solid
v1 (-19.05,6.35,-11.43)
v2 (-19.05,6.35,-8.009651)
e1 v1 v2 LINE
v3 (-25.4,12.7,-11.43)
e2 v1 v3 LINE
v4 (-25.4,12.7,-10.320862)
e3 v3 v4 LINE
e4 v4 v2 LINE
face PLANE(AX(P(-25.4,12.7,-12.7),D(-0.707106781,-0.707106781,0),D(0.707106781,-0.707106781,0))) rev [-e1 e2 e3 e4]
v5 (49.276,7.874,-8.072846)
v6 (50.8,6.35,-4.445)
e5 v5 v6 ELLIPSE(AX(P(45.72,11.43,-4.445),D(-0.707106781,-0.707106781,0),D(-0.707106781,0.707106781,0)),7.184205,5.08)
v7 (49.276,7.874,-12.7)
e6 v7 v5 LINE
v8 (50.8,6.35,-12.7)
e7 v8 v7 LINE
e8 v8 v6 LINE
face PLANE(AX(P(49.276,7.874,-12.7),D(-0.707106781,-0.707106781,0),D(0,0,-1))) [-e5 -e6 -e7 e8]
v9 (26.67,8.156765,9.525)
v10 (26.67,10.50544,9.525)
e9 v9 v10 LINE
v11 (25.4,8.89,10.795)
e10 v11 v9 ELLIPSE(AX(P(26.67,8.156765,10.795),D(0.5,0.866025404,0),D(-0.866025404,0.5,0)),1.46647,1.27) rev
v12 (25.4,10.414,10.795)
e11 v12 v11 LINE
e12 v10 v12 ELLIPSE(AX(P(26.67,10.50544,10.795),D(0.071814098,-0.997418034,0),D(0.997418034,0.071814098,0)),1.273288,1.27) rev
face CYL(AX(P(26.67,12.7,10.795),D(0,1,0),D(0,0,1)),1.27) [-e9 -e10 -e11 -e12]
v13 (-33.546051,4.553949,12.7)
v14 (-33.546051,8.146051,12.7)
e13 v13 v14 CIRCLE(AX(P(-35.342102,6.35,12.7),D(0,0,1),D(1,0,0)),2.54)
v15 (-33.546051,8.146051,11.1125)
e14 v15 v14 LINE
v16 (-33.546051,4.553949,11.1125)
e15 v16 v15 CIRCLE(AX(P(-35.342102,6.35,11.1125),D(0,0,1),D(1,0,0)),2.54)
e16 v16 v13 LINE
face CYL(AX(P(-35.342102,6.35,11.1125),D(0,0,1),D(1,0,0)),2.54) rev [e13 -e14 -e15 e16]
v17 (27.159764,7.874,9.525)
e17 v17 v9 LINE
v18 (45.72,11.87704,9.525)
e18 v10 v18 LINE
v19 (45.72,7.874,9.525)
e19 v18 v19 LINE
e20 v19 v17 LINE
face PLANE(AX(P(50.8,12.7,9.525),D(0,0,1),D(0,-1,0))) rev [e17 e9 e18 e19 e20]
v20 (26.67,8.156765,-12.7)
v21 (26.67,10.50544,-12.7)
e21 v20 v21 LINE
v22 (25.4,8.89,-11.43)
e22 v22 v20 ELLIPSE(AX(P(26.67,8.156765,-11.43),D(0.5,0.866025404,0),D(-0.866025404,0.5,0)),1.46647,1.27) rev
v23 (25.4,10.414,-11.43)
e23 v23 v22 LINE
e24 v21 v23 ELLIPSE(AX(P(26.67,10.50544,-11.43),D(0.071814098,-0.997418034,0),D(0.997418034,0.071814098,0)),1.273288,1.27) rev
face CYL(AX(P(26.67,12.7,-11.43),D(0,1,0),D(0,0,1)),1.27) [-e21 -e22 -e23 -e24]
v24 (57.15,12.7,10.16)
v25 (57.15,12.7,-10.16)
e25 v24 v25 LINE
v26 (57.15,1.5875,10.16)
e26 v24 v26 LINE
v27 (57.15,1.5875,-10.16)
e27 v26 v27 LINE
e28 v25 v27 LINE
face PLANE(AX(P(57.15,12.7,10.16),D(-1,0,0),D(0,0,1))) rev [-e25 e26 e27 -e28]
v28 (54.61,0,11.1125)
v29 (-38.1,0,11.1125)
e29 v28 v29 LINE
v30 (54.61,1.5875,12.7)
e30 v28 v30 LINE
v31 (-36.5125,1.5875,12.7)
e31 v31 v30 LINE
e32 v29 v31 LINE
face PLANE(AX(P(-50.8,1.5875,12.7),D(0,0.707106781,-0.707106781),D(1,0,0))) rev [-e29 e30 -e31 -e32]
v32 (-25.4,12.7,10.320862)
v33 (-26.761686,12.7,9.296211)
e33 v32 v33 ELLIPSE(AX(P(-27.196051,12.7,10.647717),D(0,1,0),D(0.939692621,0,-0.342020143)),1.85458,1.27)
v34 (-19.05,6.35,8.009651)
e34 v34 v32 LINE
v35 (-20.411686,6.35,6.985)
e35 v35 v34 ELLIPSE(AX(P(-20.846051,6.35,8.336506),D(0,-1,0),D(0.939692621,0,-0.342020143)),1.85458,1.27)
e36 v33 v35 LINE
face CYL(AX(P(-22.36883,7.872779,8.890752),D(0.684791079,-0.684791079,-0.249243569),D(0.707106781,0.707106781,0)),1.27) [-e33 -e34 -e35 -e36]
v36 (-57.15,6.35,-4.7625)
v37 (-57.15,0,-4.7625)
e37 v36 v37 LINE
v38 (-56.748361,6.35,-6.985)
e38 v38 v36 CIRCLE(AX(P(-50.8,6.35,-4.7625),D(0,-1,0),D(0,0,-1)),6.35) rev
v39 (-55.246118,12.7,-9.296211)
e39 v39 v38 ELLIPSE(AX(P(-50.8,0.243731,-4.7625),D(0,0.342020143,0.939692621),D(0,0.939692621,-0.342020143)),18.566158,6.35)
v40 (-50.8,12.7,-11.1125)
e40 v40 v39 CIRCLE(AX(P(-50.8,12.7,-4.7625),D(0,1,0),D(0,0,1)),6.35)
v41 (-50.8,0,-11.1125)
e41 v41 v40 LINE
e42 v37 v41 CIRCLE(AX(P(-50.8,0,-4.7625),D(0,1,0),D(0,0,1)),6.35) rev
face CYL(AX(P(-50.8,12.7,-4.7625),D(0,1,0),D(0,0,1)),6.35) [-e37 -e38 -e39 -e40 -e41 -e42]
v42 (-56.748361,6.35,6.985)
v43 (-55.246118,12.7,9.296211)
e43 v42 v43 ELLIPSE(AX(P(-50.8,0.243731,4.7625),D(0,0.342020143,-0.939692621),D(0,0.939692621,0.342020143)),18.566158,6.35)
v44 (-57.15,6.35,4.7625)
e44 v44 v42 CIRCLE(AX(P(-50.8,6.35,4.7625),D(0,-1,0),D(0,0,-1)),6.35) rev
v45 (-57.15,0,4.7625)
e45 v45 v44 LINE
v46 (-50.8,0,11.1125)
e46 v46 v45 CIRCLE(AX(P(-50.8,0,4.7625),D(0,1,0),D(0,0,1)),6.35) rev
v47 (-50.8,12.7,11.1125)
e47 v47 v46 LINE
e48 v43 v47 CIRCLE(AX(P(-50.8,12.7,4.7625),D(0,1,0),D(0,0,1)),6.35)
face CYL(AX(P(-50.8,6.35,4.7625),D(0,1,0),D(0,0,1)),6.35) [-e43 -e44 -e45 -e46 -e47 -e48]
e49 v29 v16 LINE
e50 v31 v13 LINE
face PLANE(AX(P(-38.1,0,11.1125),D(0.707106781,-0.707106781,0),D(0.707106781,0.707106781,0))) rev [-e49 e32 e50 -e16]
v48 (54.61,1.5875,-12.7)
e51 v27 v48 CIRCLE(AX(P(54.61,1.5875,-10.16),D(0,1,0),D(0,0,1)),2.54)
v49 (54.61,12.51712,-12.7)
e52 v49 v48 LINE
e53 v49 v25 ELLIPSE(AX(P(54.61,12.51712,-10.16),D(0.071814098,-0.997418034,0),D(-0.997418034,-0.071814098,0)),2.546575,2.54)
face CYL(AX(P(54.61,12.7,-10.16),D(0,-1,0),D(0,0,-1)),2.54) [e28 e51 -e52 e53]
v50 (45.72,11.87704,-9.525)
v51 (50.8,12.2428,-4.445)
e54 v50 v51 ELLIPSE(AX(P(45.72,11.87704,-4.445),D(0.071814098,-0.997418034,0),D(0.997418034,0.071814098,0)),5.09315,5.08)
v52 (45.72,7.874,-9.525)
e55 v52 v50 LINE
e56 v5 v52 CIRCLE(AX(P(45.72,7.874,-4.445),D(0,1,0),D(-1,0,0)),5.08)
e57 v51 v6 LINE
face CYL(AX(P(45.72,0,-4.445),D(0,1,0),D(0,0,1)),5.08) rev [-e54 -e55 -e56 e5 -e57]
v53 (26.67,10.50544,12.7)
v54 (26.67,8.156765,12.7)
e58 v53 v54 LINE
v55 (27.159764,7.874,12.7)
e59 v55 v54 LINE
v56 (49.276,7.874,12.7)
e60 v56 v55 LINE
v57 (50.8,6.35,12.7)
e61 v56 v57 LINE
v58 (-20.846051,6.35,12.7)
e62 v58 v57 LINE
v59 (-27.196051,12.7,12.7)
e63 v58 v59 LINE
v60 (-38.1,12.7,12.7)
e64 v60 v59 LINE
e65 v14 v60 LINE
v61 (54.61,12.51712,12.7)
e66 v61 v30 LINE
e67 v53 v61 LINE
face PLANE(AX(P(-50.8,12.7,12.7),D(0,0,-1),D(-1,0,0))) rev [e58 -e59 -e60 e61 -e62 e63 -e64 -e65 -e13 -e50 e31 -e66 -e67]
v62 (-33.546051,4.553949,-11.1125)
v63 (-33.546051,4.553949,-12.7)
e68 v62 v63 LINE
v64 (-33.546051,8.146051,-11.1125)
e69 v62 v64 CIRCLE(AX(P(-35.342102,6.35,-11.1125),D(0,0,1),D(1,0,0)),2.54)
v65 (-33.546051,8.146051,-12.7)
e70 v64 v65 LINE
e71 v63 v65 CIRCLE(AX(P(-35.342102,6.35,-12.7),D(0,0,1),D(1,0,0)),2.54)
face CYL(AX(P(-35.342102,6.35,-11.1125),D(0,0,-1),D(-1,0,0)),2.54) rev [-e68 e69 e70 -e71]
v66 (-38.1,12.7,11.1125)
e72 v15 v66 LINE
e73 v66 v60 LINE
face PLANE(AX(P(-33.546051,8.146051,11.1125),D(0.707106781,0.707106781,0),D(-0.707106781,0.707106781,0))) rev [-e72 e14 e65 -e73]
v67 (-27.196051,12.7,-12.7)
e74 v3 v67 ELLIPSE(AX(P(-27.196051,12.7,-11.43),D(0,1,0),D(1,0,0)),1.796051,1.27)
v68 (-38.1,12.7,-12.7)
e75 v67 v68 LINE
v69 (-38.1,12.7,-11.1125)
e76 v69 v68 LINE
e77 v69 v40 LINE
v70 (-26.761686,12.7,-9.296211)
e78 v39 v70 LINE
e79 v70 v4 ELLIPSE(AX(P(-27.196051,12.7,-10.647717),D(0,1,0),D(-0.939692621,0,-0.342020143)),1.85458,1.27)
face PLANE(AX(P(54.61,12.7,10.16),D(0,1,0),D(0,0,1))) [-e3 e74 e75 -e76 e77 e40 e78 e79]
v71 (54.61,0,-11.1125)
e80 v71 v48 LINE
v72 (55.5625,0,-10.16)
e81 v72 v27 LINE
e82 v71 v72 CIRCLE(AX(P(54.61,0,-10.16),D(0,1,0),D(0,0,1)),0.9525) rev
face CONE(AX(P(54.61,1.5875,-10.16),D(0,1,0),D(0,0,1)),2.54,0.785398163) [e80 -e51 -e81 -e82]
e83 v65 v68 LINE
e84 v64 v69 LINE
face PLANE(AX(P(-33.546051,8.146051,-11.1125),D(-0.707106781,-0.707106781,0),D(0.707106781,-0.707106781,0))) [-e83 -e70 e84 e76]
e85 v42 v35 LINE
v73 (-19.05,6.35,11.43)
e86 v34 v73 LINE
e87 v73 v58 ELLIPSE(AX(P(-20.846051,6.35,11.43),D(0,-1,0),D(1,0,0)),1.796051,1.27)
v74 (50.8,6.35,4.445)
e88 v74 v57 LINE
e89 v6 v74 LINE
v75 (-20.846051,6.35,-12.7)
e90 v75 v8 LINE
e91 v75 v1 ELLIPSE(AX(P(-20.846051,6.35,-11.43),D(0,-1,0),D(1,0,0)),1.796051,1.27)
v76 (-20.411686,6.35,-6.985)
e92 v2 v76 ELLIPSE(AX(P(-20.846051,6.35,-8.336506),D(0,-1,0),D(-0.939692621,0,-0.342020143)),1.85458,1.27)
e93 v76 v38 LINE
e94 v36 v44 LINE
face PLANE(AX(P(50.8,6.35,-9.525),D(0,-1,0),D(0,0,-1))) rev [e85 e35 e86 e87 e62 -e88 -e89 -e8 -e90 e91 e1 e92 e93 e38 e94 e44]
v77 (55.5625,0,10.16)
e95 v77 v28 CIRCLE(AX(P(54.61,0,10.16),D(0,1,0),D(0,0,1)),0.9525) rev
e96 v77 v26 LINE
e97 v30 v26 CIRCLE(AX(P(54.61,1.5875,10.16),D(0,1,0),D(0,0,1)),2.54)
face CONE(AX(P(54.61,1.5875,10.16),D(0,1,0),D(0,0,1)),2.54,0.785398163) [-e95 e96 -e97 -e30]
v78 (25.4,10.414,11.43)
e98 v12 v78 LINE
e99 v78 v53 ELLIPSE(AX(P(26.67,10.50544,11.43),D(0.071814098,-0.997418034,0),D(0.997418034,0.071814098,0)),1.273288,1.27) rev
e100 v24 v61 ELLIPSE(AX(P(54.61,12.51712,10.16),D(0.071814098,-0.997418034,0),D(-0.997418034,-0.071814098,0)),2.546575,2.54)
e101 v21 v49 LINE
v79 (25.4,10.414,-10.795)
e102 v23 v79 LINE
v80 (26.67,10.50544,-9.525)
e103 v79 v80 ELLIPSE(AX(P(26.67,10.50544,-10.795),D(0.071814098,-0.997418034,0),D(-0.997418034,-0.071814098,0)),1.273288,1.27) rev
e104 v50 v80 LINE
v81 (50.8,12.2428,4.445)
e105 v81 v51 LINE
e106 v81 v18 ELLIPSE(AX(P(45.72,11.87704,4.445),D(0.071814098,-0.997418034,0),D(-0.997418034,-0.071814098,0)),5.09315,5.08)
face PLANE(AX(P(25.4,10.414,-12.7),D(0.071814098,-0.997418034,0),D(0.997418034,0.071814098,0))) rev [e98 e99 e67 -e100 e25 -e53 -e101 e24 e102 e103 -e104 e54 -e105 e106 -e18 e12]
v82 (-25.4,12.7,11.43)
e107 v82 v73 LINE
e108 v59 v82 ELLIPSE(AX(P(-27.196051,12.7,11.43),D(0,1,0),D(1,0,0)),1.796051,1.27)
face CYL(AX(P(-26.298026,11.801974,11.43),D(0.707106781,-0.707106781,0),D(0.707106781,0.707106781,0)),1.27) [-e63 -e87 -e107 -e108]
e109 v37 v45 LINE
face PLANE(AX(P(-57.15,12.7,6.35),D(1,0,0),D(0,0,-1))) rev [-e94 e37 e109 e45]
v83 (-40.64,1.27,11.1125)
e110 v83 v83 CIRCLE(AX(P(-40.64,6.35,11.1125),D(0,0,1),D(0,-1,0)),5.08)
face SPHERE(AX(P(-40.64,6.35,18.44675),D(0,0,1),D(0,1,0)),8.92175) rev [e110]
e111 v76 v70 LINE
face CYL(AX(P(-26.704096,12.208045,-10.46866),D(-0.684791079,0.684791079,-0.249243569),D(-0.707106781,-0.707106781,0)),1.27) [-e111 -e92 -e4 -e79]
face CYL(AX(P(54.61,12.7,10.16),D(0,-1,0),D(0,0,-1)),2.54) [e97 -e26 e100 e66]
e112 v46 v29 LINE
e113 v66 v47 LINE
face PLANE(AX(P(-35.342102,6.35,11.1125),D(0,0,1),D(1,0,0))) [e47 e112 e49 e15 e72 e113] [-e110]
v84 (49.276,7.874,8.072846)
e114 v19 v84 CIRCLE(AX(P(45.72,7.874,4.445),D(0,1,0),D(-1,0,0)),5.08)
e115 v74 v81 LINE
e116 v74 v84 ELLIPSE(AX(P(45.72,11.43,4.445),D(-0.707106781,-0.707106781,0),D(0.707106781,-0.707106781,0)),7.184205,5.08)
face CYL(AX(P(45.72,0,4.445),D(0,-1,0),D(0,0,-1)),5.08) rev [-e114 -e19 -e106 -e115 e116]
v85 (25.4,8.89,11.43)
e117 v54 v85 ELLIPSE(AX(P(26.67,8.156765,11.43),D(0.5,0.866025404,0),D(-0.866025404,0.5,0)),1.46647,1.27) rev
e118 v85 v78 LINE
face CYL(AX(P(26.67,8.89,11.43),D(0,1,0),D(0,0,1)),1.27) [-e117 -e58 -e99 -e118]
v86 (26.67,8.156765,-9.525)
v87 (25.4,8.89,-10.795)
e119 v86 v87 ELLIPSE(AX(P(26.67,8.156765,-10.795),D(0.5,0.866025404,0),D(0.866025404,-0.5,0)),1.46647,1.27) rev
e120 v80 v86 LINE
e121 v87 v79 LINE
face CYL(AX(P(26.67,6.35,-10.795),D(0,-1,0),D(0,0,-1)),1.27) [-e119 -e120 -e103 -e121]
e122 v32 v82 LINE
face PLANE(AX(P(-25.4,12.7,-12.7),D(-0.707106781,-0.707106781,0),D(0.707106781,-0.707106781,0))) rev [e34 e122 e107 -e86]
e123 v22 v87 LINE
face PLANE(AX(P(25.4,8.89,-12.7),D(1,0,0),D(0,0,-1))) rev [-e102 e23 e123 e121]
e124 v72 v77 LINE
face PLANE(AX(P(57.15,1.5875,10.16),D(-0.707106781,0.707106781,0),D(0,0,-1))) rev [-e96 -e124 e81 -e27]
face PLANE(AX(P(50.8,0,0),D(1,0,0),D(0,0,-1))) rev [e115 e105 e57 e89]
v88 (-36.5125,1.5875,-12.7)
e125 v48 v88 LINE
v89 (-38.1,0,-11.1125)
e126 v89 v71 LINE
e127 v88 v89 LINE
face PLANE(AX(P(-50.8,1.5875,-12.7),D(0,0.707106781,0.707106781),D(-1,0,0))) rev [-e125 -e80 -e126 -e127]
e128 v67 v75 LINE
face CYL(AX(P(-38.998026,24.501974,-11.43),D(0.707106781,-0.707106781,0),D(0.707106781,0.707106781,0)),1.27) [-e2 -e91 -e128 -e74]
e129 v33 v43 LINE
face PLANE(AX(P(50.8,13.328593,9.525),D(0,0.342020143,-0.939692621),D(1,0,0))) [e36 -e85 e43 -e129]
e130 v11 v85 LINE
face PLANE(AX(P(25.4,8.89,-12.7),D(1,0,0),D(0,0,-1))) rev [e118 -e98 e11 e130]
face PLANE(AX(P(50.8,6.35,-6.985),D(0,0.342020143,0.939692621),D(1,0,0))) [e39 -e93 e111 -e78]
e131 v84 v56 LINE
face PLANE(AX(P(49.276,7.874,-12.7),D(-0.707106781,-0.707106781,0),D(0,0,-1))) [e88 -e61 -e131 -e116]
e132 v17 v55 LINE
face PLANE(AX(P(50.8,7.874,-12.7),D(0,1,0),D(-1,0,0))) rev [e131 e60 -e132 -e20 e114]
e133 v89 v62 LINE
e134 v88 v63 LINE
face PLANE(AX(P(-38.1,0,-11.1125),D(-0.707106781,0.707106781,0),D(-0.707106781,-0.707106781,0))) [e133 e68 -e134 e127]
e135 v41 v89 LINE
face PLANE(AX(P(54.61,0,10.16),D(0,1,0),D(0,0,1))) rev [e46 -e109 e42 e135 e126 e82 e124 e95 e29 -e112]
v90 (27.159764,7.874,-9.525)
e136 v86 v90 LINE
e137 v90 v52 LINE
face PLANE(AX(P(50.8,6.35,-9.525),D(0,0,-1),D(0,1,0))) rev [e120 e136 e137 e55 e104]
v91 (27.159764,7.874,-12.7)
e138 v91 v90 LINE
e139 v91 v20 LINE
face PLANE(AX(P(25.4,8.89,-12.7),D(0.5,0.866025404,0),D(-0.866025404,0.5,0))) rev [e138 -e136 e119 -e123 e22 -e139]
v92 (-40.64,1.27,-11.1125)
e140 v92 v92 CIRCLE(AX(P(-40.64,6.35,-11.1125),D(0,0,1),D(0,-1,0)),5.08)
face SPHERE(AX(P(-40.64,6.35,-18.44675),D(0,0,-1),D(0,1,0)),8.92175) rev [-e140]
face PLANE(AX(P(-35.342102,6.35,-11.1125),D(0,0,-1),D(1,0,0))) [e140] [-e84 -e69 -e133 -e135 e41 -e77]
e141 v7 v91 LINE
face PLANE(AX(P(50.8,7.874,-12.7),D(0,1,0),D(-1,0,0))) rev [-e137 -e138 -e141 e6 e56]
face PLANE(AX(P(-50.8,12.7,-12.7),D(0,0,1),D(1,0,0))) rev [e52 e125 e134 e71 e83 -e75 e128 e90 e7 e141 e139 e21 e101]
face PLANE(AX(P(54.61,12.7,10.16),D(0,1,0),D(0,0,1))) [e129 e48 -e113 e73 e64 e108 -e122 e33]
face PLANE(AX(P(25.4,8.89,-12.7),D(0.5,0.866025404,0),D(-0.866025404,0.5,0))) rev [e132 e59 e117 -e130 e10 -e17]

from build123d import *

# Parameters (mm, degrees)
BOSS_EXTRUDE1_DEPTH = 12.7
SKETCH2_W           = 19.05
SKETCH2_H           = 6.35
CUT_EXTRUDE1_DEPTH  = 107.95
CUT_EXTRUDE2_DEPTH  = 64.816710194
CHAMFER1_SIZE       = 6.978592645
CHAMFER1_SIZE_2     = 2.54
CUT_EXTRUDE3_DEPTH  = 1.5875
CHAMFER3_SIZE       = 1.5875
FILLET1_R           = 6.35
FILLET2_R           = 1.27
FILLET3_R           = 5.08
CHAMFER4_SIZE       = 1.524


# Some blends are built 0.0001 mm under size
with BuildPart() as part:
    # Sketch1 → Boss-Extrude1 (new body)
    with BuildSketch(Plane(origin=(0, 0, 0), x_dir=(1, 0, 0), z_dir=(0, 1, 0))):
        with BuildLine():
            Line((-50.8, 12.7), (-57.15, 12.7))
            Line((-57.15, 12.7), (-57.15, 6.35))
            Line((-57.15, 6.35), (-57.15, -6.35))
            Line((-57.15, -6.35), (-57.15, -12.7))
            Line((-57.15, -12.7), (-50.8, -12.7))
            Line((-50.8, -12.7), (54.61, -12.7))
            ThreePointArc((54.61, -12.7), (56.406051224, -11.956051224), (57.15, -10.16))
            Line((57.15, -10.16), (57.15, 10.16))
            ThreePointArc((57.15, 10.16), (56.406051224, 11.956051224), (54.61, 12.7))
            Line((54.61, 12.7), (-50.8, 12.7))
        make_face()
    extrude(amount=BOSS_EXTRUDE1_DEPTH)

    # Sketch2 → Cut-Extrude1 (cut)
    with BuildSketch(Plane.ZY.offset(57.15)):
        with Locations((0, 9.525)):
            Rectangle(SKETCH2_W, SKETCH2_H)
    extrude(amount=-CUT_EXTRUDE1_DEPTH, mode=Mode.SUBTRACT)

    # Sketch3 → Cut-Extrude2 (cut, through all)
    with BuildSketch(Plane.XY.offset(12.7)):
        Polygon((25.4, 10.414), (57.15, 12.7), (-25.4, 12.7), (-19.05, 6.35), (50.8, 6.35), (50.8, 7.874), (27.15976362, 7.874), (25.4, 8.89), align=None)
    extrude(amount=-CUT_EXTRUDE2_DEPTH, mode=Mode.SUBTRACT)

    # Chamfer1
    # the kernel refuses this chamfer: 6.978592645, 2.54 mm, written as the material it adds along each edge
    with BuildSketch(Plane(origin=(-57.15, 6.35, 9.525), x_dir=(0, 0.9999130865277316, 0.013184058198642549), z_dir=(1, 0, 0))) as chamfer1_piece_1_section:
        Polygon((CHAMFER1_SIZE * 0.999913086587, -CHAMFER1_SIZE * 0.0131840581994), (-CHAMFER1_SIZE_2 * 0.0131840581987, -CHAMFER1_SIZE_2 * 0.999913086528), (0, 0), align=None)
    chamfer1_piece_1 = extrude(amount=56.203828281, mode=Mode.PRIVATE)
    chamfer1_piece_1 = split(chamfer1_piece_1, bisect_by=Plane(origin=(-39.199121236, 12.7, 8.706690515), z_dir=(0, -1, 0)), keep=Keep.TOP, mode=Mode.PRIVATE)
    chamfer1_piece_1 = split(chamfer1_piece_1, bisect_by=Plane(origin=(-30.223681853, 17.523681853, 8.706690515), z_dir=(-0.7071067811865448, -0.7071067811865503, 0)), keep=Keep.TOP, mode=Mode.PRIVATE)
    add(chamfer1_piece_1)
    with BuildSketch(Plane(origin=(-57.15, 6.35, -9.525), x_dir=(0, -0.09904090225207035, 0.9950833631817466), z_dir=(1, 0, 0))) as chamfer1_piece_2_section:
        Polygon((CHAMFER1_SIZE_2 * 0.995083363182, -CHAMFER1_SIZE_2 * 0.099040902252), (-CHAMFER1_SIZE * 0.099040902258, -CHAMFER1_SIZE * 0.995083363241), (0, 0), align=None)
    chamfer1_piece_2 = extrude(amount=56.203828281, mode=Mode.PRIVATE)
    chamfer1_piece_2 = split(chamfer1_piece_2, bisect_by=Plane(origin=(-30.223681853, 17.523681853, -8.706690515), z_dir=(-0.7071067811865448, -0.7071067811865503, 0)), keep=Keep.TOP, mode=Mode.PRIVATE)
    chamfer1_piece_2 = split(chamfer1_piece_2, bisect_by=Plane(origin=(-39.199121236, 12.7, -8.706690515), z_dir=(0, -1, 0)), keep=Keep.TOP, mode=Mode.PRIVATE)
    add(chamfer1_piece_2)

    # Sketch4 → Cut-Extrude3 (cut)
    with BuildSketch(Plane.XY.offset(12.7)):
        with BuildLine():
            Line((-57.15, 12.7), (-57.15, 0))
            Line((-57.15, 0), (-38.1, 0))
            Line((-38.1, 0), (-33.546051224, 4.553948776))
            ThreePointArc((-33.546051224, 4.553948776), (-32.802102448, 6.35), (-33.546051224, 8.146051224))
            Line((-33.546051224, 8.146051224), (-38.1, 12.7))
            Line((-38.1, 12.7), (-57.15, 12.7))
        make_face()
    cut_extrude3 = extrude(amount=-CUT_EXTRUDE3_DEPTH, mode=Mode.SUBTRACT)

    # Sketch6 → Cut-Revolve1 (revolve, cut)
    with BuildSketch(Plane.ZY.offset(40.64)):
        with BuildLine():
            Line((11.1125, 6.35), (11.1125, 11.43))
            ThreePointArc((11.1125, 11.43), (9.931118256, 9.01113492), (9.525, 6.35))
            Line((9.525, 6.35), (11.1125, 6.35))
        make_face()
    cut_revolve1 = revolve(axis=Axis((-40.64, 6.35, 12.7), (0, 0, -1)), mode=Mode.SUBTRACT)

    # Mirror1: Cut-Extrude3, Cut-Revolve1 across plane
    add(cut_extrude3.mirror(Plane(origin=(0, 0, 0), x_dir=(1, 0, 0), z_dir=(0, 0, -1))), mode=Mode.SUBTRACT)
    add(cut_revolve1.mirror(Plane(origin=(0, 0, 0), x_dir=(1, 0, 0), z_dir=(0, 0, -1))), mode=Mode.SUBTRACT)

    # Chamfer3
    chamfer3_edges = [part.edges().sort_by_distance(p)[0] for p in [
        (8.255, 0, 12.7),
        (56.406051224, 0, 11.956051224),
        (57.15, 0, 0),
        (56.406051224, 0, -11.956051224),
        (8.255, 0, -12.7),
    ]]
    chamfer(chamfer3_edges, length=CHAMFER3_SIZE)

    # Fillet1
    fillet1_edges = [part.edges().sort_by_distance(p)[0] for p in [
        (-57.15, 6.35, -11.1125),
        (-57.15, 6.35, 11.1125),
    ]]
    fillet(fillet1_edges, radius=FILLET1_R)

    # Fillet2
    fillet2_edges = [part.edges().sort_by_distance(p)[0] for p in [
        (-22.225, 9.525, 8.140605494),
        (-22.225, 9.525, -8.140605494),
        (25.4, 9.652, -9.525),
        (-22.225, 9.525, 12.7),
        (25.4, 9.652, 12.7),
        (25.4, 9.652, 9.525),
        (25.4, 9.652, -12.7),
        (-22.225, 9.525, -12.7),
    ]]
    fillet(fillet2_edges, radius=FILLET2_R)

    # Fillet3
    fillet3_edges = [part.edges().sort_by_distance(p)[0] for p in [
        (50.8, 10.0584, -9.525),
        (50.8, 10.0584, 9.525),
    ]]
    fillet(fillet3_edges, radius=FILLET3_R)

    # Chamfer4
    chamfer4_edges = [part.edges().sort_by_distance(p)[0] for p in [
        (50.8, 7.874, -8.5725),
        (50.8, 7.874, 8.5725),
    ]]
    chamfer(chamfer4_edges, length=CHAMFER4_SIZE - 0.0001)  # a hair under: the kernel refuses the full size


solid = part.part
